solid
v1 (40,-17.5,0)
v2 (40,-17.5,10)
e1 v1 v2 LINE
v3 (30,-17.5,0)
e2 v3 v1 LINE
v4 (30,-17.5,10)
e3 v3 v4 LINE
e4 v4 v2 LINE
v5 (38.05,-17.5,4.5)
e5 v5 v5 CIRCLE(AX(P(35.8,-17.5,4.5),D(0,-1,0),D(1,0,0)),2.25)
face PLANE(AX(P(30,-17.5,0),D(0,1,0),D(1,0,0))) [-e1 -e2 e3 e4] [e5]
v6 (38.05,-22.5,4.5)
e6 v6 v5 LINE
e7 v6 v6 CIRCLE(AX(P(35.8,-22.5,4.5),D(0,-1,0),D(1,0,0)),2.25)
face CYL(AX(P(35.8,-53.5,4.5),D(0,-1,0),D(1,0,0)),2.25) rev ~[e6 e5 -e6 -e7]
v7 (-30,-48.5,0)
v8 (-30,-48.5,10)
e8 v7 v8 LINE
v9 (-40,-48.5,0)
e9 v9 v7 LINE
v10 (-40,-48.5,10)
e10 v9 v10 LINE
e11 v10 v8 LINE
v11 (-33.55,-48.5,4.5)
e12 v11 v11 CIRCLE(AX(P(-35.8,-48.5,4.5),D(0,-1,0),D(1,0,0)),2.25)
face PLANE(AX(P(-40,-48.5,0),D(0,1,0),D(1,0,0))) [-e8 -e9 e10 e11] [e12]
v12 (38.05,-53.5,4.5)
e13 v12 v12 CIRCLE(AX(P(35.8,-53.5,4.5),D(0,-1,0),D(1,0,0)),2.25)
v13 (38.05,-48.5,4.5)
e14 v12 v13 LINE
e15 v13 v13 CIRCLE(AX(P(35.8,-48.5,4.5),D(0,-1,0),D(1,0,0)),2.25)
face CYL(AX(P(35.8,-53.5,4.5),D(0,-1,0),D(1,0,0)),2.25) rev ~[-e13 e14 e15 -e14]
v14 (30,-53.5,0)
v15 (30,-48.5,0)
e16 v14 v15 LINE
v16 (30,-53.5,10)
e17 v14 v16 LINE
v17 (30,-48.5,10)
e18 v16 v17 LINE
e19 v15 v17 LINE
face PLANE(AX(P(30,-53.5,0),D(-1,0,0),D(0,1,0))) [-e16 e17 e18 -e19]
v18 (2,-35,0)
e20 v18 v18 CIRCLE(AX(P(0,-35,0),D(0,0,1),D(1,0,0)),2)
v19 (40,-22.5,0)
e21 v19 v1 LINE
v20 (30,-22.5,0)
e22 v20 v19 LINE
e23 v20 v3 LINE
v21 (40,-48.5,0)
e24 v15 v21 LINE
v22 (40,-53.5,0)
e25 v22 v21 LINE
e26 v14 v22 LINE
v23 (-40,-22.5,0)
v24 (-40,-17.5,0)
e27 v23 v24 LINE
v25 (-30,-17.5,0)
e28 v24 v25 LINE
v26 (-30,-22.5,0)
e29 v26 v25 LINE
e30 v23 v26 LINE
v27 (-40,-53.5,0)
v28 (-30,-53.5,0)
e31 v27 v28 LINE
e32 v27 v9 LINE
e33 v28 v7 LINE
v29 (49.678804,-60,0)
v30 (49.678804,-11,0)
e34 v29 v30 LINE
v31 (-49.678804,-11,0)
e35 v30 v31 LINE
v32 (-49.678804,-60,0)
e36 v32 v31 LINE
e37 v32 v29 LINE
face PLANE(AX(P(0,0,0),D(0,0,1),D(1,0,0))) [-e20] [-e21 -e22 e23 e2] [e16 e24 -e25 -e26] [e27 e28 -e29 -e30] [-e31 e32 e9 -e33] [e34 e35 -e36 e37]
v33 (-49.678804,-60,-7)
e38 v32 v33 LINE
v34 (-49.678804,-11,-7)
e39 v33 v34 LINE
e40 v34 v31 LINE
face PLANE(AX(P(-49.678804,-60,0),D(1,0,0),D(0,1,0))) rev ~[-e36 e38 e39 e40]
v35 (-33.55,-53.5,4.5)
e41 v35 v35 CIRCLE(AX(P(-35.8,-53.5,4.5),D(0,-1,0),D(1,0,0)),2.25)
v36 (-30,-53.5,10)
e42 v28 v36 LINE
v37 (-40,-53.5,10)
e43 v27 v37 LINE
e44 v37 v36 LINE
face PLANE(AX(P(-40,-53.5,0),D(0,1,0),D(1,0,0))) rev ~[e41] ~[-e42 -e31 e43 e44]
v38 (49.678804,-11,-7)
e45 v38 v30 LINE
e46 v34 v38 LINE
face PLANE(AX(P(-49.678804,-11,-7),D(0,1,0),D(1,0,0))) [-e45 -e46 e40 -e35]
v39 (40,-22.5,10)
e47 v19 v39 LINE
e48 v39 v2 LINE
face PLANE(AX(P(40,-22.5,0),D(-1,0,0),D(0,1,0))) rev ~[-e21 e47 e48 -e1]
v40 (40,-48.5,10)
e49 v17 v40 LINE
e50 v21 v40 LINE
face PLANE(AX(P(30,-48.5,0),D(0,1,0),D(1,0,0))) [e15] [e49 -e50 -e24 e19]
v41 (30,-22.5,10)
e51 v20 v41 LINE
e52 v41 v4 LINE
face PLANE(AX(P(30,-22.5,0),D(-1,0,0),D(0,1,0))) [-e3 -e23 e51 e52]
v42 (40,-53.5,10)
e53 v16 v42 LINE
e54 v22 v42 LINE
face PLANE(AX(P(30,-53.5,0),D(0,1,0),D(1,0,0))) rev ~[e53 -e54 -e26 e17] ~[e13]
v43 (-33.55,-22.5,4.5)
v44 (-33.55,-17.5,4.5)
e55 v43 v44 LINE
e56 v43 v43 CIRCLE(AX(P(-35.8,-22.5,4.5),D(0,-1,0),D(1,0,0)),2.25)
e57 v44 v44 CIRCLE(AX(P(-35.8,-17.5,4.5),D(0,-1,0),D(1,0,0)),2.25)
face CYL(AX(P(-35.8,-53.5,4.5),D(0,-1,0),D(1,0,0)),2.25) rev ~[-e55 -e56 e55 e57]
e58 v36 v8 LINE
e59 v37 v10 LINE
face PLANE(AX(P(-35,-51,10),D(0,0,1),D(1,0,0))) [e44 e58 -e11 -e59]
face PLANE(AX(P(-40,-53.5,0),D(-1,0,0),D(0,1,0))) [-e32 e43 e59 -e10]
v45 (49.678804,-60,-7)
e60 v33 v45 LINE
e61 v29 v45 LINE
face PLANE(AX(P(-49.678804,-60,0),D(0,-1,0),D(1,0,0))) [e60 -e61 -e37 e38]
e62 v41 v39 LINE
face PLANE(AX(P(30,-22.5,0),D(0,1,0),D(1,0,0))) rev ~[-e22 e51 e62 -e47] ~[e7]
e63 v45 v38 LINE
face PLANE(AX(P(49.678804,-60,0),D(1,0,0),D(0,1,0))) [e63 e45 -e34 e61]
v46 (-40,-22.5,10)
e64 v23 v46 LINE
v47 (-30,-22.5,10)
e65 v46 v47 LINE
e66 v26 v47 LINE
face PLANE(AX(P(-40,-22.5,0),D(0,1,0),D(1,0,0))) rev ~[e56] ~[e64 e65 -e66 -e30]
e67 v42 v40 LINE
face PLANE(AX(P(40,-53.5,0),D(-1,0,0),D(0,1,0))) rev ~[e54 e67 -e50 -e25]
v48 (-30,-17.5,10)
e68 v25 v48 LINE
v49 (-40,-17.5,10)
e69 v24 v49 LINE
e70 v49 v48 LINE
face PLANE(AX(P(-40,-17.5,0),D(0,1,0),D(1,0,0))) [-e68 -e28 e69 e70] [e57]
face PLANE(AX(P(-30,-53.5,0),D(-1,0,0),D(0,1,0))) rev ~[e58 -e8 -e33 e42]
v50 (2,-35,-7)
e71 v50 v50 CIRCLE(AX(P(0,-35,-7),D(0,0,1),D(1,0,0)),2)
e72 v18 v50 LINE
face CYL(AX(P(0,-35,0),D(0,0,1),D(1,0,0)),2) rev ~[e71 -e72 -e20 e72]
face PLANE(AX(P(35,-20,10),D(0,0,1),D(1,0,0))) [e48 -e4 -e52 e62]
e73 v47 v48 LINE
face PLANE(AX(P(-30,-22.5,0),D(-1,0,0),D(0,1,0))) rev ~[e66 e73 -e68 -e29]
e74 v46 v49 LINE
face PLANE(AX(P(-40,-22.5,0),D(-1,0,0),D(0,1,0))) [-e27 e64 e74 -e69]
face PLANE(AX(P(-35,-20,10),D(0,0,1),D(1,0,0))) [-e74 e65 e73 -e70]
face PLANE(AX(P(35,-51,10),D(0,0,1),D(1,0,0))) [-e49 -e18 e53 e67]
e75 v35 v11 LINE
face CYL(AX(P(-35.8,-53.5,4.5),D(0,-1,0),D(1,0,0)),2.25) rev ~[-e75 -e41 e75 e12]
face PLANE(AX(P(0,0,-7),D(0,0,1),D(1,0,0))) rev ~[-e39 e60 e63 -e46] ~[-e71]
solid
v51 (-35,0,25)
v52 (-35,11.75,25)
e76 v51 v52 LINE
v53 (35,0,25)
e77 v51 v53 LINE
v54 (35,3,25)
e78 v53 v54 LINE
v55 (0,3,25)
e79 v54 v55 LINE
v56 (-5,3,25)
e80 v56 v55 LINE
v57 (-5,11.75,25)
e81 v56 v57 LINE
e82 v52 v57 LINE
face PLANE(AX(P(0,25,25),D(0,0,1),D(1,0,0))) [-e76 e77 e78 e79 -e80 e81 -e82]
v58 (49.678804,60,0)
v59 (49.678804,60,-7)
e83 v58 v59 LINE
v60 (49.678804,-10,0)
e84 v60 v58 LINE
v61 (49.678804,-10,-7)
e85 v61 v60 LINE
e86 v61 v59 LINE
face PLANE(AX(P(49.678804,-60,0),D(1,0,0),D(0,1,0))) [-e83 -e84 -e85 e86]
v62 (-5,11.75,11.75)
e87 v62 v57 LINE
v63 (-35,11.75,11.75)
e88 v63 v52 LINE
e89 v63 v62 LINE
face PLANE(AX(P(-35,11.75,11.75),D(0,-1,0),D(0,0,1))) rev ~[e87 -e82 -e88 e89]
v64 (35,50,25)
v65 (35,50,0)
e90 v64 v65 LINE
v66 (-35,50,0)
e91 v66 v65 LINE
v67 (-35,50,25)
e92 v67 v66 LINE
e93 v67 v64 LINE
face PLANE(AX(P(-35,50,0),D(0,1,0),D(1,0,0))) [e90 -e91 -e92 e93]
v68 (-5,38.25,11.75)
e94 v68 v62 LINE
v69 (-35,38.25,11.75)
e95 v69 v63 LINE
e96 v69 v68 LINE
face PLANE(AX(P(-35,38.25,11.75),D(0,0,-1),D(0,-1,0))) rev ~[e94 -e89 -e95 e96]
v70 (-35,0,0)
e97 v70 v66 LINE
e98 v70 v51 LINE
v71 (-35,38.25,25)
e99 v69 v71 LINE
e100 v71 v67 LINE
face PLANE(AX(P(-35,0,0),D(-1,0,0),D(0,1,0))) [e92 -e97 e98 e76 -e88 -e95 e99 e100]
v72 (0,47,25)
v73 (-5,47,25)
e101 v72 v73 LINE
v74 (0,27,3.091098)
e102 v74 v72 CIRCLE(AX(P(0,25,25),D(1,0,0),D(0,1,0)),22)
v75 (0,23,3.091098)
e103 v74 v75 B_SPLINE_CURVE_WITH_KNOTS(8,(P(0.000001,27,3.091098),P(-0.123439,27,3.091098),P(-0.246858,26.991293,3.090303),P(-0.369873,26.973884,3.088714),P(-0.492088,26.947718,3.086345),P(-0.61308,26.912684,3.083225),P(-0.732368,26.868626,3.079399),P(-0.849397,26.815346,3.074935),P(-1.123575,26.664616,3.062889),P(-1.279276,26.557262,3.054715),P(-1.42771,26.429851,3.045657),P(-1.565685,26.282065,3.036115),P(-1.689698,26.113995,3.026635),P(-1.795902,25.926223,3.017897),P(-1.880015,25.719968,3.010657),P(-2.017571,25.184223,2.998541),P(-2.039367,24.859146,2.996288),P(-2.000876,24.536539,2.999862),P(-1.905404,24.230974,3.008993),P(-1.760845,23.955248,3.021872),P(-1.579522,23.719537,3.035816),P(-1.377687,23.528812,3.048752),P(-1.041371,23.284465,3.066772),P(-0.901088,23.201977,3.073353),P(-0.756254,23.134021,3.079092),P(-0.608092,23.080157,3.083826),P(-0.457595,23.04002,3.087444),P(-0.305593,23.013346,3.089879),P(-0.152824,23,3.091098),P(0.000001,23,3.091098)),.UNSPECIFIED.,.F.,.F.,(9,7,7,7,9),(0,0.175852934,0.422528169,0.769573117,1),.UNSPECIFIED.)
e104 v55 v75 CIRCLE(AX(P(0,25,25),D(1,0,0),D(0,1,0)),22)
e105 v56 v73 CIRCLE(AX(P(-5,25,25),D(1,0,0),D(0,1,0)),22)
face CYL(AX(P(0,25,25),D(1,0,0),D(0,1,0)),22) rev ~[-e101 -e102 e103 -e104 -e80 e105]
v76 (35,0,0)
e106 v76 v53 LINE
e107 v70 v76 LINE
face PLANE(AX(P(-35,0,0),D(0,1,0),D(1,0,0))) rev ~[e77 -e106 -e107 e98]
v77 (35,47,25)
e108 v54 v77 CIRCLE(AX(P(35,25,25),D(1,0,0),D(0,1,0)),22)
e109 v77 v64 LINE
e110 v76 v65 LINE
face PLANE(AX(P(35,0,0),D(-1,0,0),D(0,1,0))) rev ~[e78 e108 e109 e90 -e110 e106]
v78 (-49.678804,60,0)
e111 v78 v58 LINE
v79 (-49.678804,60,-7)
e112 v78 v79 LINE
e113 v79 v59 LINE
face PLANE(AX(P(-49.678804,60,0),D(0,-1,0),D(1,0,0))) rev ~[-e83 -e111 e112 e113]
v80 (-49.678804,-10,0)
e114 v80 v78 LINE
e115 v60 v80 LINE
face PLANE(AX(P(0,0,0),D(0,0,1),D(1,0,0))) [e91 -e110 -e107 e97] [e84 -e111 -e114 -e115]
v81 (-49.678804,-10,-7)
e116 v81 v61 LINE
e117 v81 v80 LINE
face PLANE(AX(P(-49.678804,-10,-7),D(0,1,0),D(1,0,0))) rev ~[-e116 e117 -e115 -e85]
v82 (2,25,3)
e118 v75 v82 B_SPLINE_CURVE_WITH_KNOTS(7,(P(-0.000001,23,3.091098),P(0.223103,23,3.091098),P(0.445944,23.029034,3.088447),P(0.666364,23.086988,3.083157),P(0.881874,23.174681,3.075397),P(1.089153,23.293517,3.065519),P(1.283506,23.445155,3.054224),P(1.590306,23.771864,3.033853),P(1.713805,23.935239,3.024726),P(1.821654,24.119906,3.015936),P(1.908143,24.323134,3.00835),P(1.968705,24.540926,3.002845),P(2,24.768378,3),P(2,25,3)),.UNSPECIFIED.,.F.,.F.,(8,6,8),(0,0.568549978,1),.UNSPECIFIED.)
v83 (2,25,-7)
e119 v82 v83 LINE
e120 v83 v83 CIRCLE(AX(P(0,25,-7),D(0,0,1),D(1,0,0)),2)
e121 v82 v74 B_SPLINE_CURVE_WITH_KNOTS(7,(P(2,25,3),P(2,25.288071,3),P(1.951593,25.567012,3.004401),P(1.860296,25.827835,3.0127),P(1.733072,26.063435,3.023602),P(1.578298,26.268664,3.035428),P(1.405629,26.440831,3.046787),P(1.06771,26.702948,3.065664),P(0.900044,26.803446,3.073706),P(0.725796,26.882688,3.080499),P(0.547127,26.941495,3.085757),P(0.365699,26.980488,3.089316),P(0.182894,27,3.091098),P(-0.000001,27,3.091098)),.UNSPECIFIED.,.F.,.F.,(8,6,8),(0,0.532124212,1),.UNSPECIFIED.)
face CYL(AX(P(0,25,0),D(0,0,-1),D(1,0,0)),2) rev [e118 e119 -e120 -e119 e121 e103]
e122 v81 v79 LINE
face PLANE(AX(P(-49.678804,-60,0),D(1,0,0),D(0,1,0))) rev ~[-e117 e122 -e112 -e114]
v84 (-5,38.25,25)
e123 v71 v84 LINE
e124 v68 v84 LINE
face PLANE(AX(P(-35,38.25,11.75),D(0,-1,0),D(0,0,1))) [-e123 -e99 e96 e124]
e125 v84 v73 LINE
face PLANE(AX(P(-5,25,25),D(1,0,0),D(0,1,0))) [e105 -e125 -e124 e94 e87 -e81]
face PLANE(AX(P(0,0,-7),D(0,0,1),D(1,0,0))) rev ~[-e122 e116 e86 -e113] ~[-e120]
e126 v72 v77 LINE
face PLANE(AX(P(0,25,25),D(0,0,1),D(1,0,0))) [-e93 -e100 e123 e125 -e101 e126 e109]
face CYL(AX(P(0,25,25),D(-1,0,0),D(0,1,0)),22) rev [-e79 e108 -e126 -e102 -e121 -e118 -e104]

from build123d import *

# Parameters (mm, degrees)
F0_W          = 99.3576076057
F0_H          = 120
F0_R          = 2
F1_DEPTH      = 7
F2_W          = 70
F2_H          = 50
F2_R          = 2
F3_DEPTH      = 25
F2_W_2        = 10
F2_H_2        = 5
F4_DEPTH      = 10
F5_R          = 22
F6_DEPTH      = 35
F6_DEPTH_BACK = 5
F7_W          = 26.5
F7_H          = 26.5
F8_DEPTH      = 30
F9_R          = 2.25
F10_DEPTH     = 40
F11_W         = 99.3576076057
F11_H         = 1
F12_DEPTH     = 25


# Not quite as in the source:
# - a feature names something its author has since deleted; it is built from what else it names


with BuildPart() as f1:
    # F0 (on Top) → F1 (new body)
    with BuildSketch(Plane.XY):
        Rectangle(F0_W, F0_H)
        with Locations((0, -35)):
            Circle(F0_R, mode=Mode.SUBTRACT)
        with Locations((0, 25)):
            Circle(F0_R, mode=Mode.SUBTRACT)
    extrude(amount=-F1_DEPTH)

    # F2 (on face) → F3 (join)
    with BuildSketch(Plane.XY):
        with Locations((0, 25)):
            Rectangle(F2_W, F2_H)
        with Locations((0, 25)):
            Circle(F2_R, mode=Mode.SUBTRACT)
    extrude(amount=F3_DEPTH)

    # F2 (on face) → F4 (join)
    with BuildSketch(Plane.XY):
        with Locations((0, 25)):
            Rectangle(F2_W, F2_H)
        with Locations((0, 25)):
            Circle(F2_R, mode=Mode.SUBTRACT)
        with Locations((-35, -20)):
            Rectangle(F2_W_2, F2_H_2)
        with Locations((35, -51)):
            Rectangle(F2_W_2, F2_H_2)
        with Locations((-35, -51)):
            Rectangle(F2_W_2, F2_H_2)
        with Locations((35, -20)):
            Rectangle(F2_W_2, F2_H_2)
    extrude(amount=F4_DEPTH)

    # F5 (on Right) → F6 (cut, two sides)
    with BuildSketch(Plane.YZ) as f6_sk:
        with Locations((25, 25)):
            Circle(F5_R)
    extrude(amount=F6_DEPTH, mode=Mode.SUBTRACT)
    extrude(f6_sk.sketch, amount=-F6_DEPTH_BACK, mode=Mode.SUBTRACT)

    # F7 (on face) → F8 (cut)
    with BuildSketch(Plane(origin=(-35, 0, 0), x_dir=(0, -1, 0), z_dir=(-1, 0, 0))):
        with Locations((-25, 25)):
            Rectangle(F7_W, F7_H)
    extrude(amount=-F8_DEPTH, mode=Mode.SUBTRACT)

    # F9 (on face) → F10 (cut)
    with BuildSketch(Plane.XZ.offset(53.5)):
        with Locations((35.8, 4.5)):
            Circle(F9_R)
        with Locations((-35.8, 4.5)):
            Circle(F9_R)
    extrude(amount=-F10_DEPTH, mode=Mode.SUBTRACT)

    # F11 (on face) → F12 (cut)
    with BuildSketch(Plane(origin=(0, 0, -7), x_dir=(1, 0, 0), z_dir=(0, 0, -1))):
        with Locations((0, 10.5)):
            Rectangle(F11_W, F11_H)
    extrude(amount=-F12_DEPTH, mode=Mode.SUBTRACT)


solid = f1.part
